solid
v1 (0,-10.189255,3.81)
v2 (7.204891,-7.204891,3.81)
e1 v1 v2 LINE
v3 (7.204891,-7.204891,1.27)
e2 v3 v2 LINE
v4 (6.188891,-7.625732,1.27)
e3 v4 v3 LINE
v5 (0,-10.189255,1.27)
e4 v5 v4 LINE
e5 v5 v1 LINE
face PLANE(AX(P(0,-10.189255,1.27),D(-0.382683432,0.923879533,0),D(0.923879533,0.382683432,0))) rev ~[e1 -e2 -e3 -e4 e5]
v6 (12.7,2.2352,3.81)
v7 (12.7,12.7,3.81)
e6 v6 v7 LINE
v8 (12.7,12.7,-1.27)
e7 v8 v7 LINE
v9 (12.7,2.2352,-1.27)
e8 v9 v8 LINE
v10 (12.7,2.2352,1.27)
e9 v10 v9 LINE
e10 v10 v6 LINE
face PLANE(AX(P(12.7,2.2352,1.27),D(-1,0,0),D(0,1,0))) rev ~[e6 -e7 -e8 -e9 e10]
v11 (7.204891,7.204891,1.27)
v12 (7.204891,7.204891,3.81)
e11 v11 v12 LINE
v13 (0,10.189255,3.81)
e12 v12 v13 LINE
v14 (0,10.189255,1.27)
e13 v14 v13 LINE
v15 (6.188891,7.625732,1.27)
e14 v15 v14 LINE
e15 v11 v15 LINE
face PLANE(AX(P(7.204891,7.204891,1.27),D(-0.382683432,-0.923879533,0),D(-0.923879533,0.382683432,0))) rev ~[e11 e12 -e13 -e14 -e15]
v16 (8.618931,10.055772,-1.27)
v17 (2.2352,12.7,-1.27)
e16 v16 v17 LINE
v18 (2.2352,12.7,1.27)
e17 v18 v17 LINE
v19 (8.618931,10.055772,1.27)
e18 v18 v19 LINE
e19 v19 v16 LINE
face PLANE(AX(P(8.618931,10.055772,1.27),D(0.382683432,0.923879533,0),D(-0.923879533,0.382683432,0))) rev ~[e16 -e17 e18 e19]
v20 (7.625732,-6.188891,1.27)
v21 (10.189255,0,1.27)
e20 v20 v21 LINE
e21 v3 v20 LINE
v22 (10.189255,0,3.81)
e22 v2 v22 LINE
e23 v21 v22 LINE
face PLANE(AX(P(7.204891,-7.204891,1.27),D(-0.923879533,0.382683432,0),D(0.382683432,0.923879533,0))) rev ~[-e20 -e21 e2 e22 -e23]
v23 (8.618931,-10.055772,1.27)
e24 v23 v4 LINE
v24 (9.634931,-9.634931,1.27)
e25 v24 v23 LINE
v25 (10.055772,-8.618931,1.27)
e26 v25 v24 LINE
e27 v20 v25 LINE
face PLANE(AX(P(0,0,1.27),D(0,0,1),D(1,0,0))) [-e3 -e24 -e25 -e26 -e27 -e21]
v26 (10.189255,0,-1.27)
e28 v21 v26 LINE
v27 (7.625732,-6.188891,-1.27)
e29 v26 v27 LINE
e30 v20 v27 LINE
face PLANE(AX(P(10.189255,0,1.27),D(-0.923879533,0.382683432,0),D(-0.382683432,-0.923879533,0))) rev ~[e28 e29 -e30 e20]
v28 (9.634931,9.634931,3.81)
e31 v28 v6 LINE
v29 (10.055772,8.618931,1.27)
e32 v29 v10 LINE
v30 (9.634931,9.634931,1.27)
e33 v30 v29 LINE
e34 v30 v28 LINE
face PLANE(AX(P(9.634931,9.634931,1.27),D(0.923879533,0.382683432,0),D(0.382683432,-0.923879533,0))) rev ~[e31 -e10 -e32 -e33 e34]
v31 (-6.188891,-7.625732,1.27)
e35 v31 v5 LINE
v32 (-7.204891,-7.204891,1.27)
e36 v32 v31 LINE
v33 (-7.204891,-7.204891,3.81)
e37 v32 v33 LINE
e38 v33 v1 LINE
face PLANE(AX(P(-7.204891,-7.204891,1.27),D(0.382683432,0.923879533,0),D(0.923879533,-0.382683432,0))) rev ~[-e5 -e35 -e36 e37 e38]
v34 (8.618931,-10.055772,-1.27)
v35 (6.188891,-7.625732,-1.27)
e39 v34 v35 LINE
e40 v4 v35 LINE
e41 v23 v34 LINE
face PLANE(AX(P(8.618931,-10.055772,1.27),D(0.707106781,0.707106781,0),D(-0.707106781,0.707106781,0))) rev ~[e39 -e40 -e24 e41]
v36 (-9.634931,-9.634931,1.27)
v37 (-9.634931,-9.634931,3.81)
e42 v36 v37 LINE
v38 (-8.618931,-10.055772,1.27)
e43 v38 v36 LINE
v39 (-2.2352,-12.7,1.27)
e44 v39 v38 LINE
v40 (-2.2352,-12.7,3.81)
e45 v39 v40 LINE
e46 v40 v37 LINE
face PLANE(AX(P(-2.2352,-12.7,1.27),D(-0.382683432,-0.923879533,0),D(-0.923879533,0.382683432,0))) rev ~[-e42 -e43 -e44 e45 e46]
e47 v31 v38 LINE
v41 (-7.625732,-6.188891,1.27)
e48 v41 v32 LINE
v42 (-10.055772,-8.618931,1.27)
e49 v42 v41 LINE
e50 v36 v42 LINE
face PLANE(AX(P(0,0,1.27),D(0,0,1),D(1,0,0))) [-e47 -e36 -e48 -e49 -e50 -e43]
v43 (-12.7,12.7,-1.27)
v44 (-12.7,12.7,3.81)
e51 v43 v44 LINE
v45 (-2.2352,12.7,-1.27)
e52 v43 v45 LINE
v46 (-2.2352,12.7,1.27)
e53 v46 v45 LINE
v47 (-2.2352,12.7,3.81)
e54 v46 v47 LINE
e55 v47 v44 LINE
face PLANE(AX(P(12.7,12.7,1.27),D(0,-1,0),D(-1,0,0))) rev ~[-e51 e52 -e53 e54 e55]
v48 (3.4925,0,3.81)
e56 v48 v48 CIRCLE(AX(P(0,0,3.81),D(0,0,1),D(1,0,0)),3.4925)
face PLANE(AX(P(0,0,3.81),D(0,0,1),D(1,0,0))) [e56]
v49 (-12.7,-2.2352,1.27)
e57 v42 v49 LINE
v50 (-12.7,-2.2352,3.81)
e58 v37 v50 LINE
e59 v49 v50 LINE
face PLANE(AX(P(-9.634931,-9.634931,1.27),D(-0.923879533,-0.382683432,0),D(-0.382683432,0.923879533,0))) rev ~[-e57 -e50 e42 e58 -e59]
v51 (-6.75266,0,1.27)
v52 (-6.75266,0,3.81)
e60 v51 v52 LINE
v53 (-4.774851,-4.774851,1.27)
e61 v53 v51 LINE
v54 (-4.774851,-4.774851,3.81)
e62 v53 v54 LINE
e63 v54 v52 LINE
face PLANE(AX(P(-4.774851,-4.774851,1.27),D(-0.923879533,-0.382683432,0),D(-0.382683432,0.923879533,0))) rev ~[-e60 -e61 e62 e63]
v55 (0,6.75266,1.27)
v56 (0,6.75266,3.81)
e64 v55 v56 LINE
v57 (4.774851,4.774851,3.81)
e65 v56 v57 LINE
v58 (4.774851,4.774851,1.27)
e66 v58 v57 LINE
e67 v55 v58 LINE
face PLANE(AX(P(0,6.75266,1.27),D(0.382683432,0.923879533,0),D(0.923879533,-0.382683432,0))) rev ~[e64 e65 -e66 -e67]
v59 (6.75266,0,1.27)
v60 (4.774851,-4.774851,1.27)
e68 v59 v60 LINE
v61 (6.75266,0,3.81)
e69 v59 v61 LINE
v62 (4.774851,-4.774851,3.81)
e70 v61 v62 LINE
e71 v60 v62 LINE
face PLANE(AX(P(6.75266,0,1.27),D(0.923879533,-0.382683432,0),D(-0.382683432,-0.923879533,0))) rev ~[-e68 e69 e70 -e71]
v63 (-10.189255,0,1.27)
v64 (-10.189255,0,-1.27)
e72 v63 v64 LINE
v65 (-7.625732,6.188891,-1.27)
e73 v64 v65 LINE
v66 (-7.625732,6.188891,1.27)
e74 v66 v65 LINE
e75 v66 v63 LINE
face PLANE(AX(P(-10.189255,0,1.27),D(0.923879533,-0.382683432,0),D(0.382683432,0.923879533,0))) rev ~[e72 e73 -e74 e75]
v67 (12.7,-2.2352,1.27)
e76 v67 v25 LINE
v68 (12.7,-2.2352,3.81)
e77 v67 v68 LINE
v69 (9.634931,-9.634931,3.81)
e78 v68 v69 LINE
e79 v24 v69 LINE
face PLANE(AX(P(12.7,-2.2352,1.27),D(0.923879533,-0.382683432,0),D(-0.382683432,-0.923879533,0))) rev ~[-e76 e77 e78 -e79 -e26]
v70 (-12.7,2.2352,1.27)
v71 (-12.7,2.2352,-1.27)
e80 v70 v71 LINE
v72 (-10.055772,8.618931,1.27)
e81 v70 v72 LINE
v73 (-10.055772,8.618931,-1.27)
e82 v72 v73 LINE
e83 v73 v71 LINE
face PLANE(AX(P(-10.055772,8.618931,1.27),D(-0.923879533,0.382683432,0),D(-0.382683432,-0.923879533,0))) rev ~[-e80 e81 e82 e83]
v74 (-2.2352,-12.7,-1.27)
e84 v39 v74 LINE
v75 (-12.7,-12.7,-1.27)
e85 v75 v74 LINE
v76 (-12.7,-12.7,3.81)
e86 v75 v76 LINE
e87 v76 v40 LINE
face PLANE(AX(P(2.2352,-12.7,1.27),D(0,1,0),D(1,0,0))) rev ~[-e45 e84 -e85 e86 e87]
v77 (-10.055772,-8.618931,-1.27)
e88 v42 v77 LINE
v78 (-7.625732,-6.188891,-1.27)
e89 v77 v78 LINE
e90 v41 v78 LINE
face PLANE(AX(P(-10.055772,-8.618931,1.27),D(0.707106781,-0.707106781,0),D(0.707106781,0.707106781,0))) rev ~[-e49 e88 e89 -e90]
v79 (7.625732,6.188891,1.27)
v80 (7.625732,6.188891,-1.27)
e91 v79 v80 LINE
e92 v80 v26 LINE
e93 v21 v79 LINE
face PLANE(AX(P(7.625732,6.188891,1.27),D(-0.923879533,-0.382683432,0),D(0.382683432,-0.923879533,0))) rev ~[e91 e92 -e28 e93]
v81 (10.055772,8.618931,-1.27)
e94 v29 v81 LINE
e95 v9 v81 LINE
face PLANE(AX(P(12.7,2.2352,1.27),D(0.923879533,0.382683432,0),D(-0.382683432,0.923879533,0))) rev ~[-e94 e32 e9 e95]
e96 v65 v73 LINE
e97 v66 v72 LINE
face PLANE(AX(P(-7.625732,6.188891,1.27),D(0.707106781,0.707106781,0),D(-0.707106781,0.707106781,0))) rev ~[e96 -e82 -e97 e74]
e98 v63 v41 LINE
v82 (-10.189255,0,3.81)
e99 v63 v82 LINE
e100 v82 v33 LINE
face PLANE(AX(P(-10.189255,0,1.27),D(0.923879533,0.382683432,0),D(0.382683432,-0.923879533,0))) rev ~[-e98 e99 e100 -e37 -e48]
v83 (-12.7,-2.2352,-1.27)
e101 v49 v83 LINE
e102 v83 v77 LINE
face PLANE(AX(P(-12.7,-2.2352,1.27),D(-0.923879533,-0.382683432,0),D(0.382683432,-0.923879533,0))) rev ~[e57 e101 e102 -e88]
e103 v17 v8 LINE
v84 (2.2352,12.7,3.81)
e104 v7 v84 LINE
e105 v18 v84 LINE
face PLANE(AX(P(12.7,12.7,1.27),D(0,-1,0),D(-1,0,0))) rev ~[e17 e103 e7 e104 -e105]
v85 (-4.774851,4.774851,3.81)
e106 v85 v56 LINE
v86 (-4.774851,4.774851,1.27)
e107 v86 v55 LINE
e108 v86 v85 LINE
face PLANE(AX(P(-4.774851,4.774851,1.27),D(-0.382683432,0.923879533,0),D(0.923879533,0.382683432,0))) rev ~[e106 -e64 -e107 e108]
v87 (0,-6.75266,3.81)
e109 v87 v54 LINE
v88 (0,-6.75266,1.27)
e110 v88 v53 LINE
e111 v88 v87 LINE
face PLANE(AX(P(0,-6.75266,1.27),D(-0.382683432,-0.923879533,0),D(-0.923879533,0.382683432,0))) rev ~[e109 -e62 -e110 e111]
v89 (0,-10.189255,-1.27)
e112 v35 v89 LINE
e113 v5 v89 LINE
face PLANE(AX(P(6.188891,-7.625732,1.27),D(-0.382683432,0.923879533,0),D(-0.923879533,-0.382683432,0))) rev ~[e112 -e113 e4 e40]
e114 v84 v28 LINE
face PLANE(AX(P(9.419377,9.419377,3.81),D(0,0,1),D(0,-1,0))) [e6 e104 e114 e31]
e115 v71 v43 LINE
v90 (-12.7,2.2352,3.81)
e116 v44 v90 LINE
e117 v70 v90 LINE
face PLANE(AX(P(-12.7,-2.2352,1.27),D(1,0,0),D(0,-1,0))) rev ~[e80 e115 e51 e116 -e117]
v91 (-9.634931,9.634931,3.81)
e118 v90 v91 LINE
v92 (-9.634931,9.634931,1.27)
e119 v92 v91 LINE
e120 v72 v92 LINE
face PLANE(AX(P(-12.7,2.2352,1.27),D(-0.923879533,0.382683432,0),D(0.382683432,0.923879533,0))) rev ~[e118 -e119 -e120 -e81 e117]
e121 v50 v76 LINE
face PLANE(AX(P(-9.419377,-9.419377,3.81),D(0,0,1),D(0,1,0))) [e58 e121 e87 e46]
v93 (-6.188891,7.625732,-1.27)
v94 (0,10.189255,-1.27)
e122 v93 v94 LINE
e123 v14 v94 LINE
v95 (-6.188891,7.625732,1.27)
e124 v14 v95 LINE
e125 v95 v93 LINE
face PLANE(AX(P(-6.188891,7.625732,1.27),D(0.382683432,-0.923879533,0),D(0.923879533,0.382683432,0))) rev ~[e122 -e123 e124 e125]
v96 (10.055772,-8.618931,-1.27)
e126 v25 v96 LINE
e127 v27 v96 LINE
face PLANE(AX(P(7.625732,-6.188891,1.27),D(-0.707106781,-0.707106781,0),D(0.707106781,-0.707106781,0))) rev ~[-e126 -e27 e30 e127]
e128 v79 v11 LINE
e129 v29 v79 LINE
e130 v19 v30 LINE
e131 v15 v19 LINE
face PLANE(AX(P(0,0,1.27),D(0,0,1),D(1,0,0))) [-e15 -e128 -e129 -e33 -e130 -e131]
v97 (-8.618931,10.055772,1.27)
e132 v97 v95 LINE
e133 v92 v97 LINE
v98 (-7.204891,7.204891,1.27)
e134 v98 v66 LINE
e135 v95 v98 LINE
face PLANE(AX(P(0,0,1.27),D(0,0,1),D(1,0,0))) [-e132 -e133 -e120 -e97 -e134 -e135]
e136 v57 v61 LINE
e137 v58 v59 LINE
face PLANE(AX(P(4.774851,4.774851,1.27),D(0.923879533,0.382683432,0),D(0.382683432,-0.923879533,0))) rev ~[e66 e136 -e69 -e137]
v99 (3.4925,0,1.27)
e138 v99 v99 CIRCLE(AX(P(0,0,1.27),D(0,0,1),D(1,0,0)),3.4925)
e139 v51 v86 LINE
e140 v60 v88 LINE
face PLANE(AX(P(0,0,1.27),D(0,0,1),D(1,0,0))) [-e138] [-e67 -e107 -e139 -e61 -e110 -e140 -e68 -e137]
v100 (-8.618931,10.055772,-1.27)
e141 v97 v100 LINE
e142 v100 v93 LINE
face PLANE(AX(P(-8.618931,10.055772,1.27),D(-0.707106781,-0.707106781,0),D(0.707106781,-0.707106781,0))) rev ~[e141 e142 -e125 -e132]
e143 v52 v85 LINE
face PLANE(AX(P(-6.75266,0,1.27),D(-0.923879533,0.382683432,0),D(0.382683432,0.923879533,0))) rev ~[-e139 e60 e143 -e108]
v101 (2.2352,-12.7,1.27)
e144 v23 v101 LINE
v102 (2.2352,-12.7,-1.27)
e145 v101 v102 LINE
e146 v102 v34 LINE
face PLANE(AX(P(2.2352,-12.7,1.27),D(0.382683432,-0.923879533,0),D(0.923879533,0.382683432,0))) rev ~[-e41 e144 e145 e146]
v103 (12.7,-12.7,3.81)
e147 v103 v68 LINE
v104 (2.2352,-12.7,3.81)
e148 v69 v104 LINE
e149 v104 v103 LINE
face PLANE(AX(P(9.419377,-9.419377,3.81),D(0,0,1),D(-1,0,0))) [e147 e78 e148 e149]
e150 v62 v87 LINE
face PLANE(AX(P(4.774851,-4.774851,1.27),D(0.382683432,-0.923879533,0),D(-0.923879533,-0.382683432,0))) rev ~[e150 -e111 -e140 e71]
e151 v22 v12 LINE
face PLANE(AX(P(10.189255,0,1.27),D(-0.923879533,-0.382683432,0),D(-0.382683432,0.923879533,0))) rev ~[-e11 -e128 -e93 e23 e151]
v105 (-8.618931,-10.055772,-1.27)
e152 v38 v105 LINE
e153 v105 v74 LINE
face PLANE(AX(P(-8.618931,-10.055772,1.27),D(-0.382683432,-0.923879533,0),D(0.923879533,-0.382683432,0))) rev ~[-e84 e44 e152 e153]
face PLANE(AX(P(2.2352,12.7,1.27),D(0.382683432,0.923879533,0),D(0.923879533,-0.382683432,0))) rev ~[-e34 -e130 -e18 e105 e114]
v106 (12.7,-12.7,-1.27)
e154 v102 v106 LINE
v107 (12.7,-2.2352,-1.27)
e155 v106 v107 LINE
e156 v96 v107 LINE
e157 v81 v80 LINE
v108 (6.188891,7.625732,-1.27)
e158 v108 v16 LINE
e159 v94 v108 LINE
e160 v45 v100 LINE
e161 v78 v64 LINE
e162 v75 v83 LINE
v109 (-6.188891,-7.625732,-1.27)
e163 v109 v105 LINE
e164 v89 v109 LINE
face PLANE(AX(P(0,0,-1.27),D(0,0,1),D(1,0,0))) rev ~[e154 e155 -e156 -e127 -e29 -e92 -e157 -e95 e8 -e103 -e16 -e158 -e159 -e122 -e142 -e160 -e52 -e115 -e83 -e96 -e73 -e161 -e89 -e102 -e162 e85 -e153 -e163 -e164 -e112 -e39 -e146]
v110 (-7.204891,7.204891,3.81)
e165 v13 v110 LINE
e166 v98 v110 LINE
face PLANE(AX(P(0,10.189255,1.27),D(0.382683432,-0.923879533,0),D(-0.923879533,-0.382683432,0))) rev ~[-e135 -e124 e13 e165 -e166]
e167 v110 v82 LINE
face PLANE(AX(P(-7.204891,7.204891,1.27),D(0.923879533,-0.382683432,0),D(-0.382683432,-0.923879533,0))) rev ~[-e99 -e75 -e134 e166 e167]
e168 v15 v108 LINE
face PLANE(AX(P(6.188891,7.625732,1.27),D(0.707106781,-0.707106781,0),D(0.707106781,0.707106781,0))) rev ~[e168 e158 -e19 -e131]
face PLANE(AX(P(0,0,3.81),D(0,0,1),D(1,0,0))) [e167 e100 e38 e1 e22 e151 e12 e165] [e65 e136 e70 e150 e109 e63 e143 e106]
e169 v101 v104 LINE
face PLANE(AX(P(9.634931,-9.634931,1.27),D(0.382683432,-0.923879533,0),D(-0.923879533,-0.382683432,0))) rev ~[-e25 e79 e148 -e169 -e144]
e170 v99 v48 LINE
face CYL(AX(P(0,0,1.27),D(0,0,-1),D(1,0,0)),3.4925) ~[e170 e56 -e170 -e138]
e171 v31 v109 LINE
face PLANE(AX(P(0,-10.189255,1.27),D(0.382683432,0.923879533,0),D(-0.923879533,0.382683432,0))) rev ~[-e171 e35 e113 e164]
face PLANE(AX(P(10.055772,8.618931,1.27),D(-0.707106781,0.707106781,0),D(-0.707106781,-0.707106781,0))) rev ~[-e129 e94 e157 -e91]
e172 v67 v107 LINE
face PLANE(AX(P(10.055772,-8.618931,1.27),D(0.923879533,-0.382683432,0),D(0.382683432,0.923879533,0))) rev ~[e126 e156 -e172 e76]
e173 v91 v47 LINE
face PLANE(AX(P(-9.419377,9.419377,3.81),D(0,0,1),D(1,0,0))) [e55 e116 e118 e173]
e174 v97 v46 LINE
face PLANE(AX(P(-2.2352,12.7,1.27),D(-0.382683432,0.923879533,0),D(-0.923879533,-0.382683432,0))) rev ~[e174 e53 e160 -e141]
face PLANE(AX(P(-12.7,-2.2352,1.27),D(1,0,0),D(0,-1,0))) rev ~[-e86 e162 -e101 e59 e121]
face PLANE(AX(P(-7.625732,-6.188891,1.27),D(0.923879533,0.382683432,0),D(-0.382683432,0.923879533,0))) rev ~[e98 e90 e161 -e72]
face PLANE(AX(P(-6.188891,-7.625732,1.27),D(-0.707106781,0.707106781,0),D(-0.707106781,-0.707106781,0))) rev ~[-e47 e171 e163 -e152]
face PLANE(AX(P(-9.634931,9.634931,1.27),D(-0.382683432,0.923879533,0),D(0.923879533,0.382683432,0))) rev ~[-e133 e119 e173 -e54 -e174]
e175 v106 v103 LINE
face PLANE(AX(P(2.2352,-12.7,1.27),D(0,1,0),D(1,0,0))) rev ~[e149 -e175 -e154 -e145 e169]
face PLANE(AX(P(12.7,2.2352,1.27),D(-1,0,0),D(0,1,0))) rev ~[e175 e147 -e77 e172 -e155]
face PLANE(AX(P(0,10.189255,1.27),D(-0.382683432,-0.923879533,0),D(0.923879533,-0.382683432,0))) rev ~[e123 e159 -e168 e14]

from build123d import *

# Parameters (mm, degrees)
F0_W            = 25.4
F0_H            = 25.4
F1_DEPTH        = 1.27
F3_DEPTH        = 2.54
F2_R            = 3.4925
F4_DEPTH        = 2.54
F5_DEPTH        = 2.54
F5_COPIES_COUNT = 4
F7_DEPTH        = 2.541
F7_COPIES_COUNT = 4


# Not quite as in the source:
# - a pattern or mirror of a feature is missing from the dataset's text; its kind, count and spacing are read off the source's solid


with BuildPart() as f1:
    # F0 (on Top) → F1 (new body, symmetric)
    with BuildSketch(Plane.XY):
        Rectangle(F0_W, F0_H)
    extrude(amount=F1_DEPTH, both=True)

    # F2 (on face) → F3 (join)
    with BuildSketch(Plane.XY.offset(1.27)):
        Polygon((0, 10.1892549187), (-7.2048912482, 7.2048912482), (-10.1892549187, 0), (-7.2048912482, -7.2048912482), (0, -10.1892549187), (7.2048912482, -7.2048912482), (10.1892549187, 0), (7.2048912482, 7.2048912482), align=None)
        Polygon((-4.7748514527, 4.7748514527), (0, 6.7526596828), (4.7748514527, 4.7748514527), (6.7526596828, 0), (4.7748514527, -4.7748514527), (0, -6.7526596828), (-4.7748514527, -4.7748514527), (-6.7526596828, 0), align=None, mode=Mode.SUBTRACT)
    extrude(amount=F3_DEPTH)

    # F2 (on face) → F4 (join, through all)
    with BuildSketch(Plane.XY.offset(1.27)):
        Circle(F2_R)
    extrude(amount=F4_DEPTH)

    # F2 (on face) → F5 (join, through all)
    with BuildSketch(Plane.XY.offset(1.27)):
        Polygon((-2.2352, 12.7), (-12.7, 12.7), (-12.7, 2.2352), (-9.6349310438, 9.6349310438), align=None)
    f5 = extrude(amount=F5_DEPTH)

    # F5_copies: F5 ×4 about axis
    f5_copies_axis = Axis((0, 0, 0), (0, 0, 1))
    for i in range(1, F5_COPIES_COUNT):
        add(f5.rotate(f5_copies_axis, i * 360 / F5_COPIES_COUNT))

    # F6 (on face) → F7 (cut, through all)
    with BuildSketch(Plane.XY.offset(1.27)):
        Polygon((-8.6189310438, 10.0557720231), (-6.1888912482, 7.6257322276), (0, 10.1892549187), (6.1888912482, 7.6257322276), (8.6189310438, 10.0557720231), (2.2352, 12.7), (-2.2352, 12.7), align=None)
    f7 = extrude(amount=-F7_DEPTH, mode=Mode.SUBTRACT)

    # F7_copies: F7 ×4 about axis
    f7_copies_axis = Axis((0, 0, 0), (0, 0, 1))
    for i in range(1, F7_COPIES_COUNT):
        add(f7.rotate(f7_copies_axis, i * 360 / F7_COPIES_COUNT), mode=Mode.SUBTRACT)


solid = f1.part
